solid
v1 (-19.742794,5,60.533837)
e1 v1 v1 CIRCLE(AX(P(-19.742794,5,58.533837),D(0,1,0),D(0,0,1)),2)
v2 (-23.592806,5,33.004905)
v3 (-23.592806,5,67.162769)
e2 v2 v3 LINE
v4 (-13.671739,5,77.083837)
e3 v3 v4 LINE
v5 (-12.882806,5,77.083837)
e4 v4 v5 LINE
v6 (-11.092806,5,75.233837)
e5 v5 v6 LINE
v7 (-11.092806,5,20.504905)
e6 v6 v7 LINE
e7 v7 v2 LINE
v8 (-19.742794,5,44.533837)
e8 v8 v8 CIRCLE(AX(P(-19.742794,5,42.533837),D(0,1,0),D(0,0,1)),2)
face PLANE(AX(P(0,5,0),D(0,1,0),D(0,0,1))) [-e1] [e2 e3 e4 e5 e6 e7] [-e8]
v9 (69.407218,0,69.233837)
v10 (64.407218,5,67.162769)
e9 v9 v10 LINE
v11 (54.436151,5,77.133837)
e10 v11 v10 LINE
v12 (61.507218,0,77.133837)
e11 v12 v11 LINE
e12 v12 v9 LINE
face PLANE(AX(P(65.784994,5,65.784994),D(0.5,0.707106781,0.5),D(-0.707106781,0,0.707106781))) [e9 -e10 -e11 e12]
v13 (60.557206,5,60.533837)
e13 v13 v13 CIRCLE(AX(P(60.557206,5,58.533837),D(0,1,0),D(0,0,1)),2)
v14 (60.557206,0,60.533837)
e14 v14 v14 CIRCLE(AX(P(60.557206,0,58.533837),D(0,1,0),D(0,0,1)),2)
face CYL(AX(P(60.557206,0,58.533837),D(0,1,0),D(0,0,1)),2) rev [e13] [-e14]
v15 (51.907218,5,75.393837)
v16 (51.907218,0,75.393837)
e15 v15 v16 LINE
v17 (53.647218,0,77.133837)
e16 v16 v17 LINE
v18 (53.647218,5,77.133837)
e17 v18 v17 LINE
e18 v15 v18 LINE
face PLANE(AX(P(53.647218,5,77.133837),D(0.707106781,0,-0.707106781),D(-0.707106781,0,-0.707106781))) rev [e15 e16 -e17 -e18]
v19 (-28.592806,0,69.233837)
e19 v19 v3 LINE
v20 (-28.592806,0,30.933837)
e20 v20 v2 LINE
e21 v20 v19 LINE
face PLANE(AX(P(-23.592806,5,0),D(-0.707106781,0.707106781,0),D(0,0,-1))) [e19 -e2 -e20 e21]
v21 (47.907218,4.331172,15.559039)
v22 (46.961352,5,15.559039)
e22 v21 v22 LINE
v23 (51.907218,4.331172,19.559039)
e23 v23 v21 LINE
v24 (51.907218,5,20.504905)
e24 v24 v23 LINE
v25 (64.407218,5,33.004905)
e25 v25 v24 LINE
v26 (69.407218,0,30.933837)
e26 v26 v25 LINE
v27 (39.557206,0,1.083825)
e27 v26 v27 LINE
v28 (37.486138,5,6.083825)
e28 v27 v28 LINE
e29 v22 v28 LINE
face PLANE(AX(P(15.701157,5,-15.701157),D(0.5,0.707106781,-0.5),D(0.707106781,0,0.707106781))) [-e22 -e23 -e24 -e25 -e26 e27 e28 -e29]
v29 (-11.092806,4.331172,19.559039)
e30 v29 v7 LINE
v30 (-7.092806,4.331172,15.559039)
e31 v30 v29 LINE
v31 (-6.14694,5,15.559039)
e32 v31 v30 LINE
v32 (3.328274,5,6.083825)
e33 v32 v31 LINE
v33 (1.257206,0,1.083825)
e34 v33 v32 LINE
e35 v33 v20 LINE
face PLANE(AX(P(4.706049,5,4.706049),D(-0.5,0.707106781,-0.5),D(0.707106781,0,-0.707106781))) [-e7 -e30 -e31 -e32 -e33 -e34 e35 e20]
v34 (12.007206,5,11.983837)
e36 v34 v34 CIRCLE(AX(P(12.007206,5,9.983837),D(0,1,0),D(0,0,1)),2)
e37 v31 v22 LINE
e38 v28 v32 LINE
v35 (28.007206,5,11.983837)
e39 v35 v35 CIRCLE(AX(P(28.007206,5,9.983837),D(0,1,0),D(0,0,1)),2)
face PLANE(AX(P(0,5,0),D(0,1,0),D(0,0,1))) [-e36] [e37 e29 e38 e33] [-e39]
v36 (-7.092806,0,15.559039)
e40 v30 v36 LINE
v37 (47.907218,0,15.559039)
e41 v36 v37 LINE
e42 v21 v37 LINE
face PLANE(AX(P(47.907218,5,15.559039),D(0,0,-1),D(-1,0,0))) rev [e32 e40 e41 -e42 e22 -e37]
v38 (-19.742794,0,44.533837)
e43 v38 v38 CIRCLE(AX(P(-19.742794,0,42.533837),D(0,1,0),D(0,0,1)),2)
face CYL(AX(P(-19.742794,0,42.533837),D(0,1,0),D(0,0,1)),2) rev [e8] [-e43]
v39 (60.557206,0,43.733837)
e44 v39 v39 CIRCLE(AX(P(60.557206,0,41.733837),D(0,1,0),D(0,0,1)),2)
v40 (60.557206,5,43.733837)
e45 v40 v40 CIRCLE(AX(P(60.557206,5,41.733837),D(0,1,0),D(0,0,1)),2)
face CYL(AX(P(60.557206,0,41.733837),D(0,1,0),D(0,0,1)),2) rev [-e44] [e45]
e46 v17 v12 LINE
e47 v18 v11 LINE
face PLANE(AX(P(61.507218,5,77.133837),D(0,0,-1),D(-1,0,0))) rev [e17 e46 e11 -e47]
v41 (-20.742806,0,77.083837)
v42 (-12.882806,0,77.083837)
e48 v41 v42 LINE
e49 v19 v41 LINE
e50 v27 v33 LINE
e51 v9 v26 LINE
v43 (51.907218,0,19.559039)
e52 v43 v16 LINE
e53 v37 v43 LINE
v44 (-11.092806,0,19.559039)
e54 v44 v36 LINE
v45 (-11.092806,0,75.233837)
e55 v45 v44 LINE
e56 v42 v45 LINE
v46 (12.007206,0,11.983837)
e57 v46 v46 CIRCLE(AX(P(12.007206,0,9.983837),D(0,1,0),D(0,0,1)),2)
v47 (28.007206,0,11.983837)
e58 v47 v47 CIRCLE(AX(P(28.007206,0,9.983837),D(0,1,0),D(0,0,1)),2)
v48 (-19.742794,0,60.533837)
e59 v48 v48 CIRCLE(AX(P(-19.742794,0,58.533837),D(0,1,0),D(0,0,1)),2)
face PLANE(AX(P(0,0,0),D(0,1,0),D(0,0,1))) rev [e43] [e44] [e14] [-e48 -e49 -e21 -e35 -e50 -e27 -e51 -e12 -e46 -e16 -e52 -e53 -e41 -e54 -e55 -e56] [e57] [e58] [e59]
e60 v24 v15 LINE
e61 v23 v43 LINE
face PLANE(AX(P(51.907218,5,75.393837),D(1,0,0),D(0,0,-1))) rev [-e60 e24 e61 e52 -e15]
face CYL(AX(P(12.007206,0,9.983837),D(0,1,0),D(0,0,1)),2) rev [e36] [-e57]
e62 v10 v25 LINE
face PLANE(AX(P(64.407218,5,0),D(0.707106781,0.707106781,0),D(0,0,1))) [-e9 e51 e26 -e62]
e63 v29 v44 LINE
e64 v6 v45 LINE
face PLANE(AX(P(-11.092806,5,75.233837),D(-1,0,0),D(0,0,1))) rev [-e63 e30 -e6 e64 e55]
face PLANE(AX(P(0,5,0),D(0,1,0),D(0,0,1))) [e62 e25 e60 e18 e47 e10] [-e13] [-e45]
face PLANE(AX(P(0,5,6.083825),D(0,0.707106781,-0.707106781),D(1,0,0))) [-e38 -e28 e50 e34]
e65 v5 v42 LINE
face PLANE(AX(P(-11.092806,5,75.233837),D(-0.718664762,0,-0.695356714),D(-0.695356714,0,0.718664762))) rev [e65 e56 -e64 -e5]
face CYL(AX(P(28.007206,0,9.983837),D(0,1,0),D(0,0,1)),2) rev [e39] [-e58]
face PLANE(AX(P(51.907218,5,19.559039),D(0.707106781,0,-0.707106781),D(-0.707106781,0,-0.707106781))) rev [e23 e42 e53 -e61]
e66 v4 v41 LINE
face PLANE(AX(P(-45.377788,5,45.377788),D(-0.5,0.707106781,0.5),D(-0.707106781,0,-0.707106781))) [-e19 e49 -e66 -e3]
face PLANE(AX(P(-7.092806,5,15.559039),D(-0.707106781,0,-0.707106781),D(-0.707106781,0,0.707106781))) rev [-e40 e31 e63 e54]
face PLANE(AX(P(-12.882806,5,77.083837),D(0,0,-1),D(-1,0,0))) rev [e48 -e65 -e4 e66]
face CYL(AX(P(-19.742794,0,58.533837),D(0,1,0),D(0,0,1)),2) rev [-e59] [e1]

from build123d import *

# Parameters (mm, degrees)
BOSS_EXTRUDE1_DEPTH = 5
SKETCH4_R           = 2
CUT_EXTRUDE1_DEPTH  = 5
CHAMFER1_SIZE       = 5


with BuildPart() as part:
    # Sketch3 → Boss-Extrude1 (new body)
    with BuildSketch(Plane(origin=(0, 0, 0), x_dir=(1, 0, 0), z_dir=(0, 1, 0))):
        Polygon((-11.092806328, -75.233836931), (-12.882806328, -77.083836936), (-20.742806328, -77.083836936), (-28.592806328, -69.233836936), (-28.592806328, -30.933836936), (-20.742806328, -23.083836936), (-6.592793915, -8.933824523), (1.257206085, -1.083824523), (39.557206085, -1.083824523), (47.407206085, -8.933824523), (69.407218499, -30.933836936), (69.407218499, -69.233836936), (61.507218499, -77.133836936), (53.647218499, -77.133836936), (51.907218499, -75.393836936), (51.907218499, -19.55903866), (47.907218499, -15.55903866), (-7.092806328, -15.55903866), (-11.092806328, -19.55903866), align=None)
    extrude(amount=BOSS_EXTRUDE1_DEPTH)

    # Sketch4 → Cut-Extrude1 (cut)
    with BuildSketch(Plane(origin=(0, 5, 0), x_dir=(1, 0, 0), z_dir=(0, 1, 0))):
        with Locations(Location((-19.742793915, -58.533836936, 0), (0, 0, 270))):
            Circle(SKETCH4_R)
        with Locations(Location((-19.742793915, -42.533836936, 0), (0, 0, 270))):
            Circle(SKETCH4_R)
        with Locations(Location((60.557206085, -41.733836936, 0), (0, 0, 270))):
            Circle(SKETCH4_R)
        with Locations(Location((60.557206085, -58.533836936, 0), (0, 0, 270))):
            Circle(SKETCH4_R)
        with Locations(Location((12.007206085, -9.983836936, 0), (0, 0, 270))):
            Circle(SKETCH4_R)
        with Locations(Location((28.007206085, -9.983836936, 0), (0, 0, 270))):
            Circle(SKETCH4_R)
    extrude(amount=-CUT_EXTRUDE1_DEPTH, mode=Mode.SUBTRACT)

    # Chamfer1
    # the kernel refuses this chamfer: 5 mm, written as the material it takes off along each edge
    with BuildSketch(Plane(origin=(78.499490898, 5, 60.141564537), x_dir=(-0.7068394360706721, 0.027495876610586303, -0.7068394360706748), z_dir=(-0.7071067811865488, 0, 0.7071067811865462))) as chamfer1_piece_1:
        Polygon((CHAMFER1_SIZE * 0.999621916911, CHAMFER1_SIZE * 0.0274958766106), (-CHAMFER1_SIZE * 0.0274958766106, CHAMFER1_SIZE * 0.999621916911), (0, 0), align=None)
    extrude(amount=36.889117022, mode=Mode.SUBTRACT)
    with BuildSketch(Plane(origin=(-11.650533929, 5, 86.176109335), x_dir=(0.7068394360706736, 0.027495876610586337, -0.7068394360706732), z_dir=(-0.7071067811865474, 0, -0.7071067811865477))) as chamfer1_piece_2:
        Polygon((CHAMFER1_SIZE * 0.999621916911, CHAMFER1_SIZE * 0.0274958766106), (-CHAMFER1_SIZE * 0.0274958766106, CHAMFER1_SIZE * 0.999621916911), (0, 0), align=None)
    extrude(amount=36.818406344, mode=Mode.SUBTRACT)
    with BuildSketch(Plane(origin=(-28.592806328, 5, 82.092251876), x_dir=(0.9996219169112968, 0.027495876610586317, 0), z_dir=(0, 0, -1)), Plane(origin=(-11.601208855, 5, 1.083824523), x_dir=(3.4424184920964096e-15, 0.027495876610586317, 0.9996219169112968), z_dir=(1, 0, 0)), Plane(origin=(69.407218499, 5, 18.075421996), x_dir=(-0.9996219169112968, 0.027495876610586282, 0), z_dir=(0, 0, 1))) as chamfer1_piece_3:
        Polygon((CHAMFER1_SIZE * 0.999621916911, CHAMFER1_SIZE * 0.0274958766106), (-CHAMFER1_SIZE * 0.0274958766106, CHAMFER1_SIZE * 0.999621916911), (0, 0), align=None)
    extrude(amount=64.01682988, mode=Mode.SUBTRACT)
    with BuildSketch(Plane(origin=(-37.685078728, 5, 40.026109335), x_dir=(0.7068394360706731, 0.027495876610586303, 0.7068394360706738), z_dir=(0.7071067811865479, 0, -0.7071067811865474)), Plane(origin=(30.464933686, 5, -8.008447877), x_dir=(-0.7068394360706771, 0.027495876610586313, 0.70683943607067), z_dir=(0.707106781186544, 0, 0.707106781186551))) as chamfer1_piece_4:
        Polygon((CHAMFER1_SIZE * 0.999621916911, CHAMFER1_SIZE * 0.0274958766106), (-CHAMFER1_SIZE * 0.0274958766106, CHAMFER1_SIZE * 0.999621916911), (0, 0), align=None)
    extrude(amount=67.931122272, mode=Mode.SUBTRACT)


solid = part.part
